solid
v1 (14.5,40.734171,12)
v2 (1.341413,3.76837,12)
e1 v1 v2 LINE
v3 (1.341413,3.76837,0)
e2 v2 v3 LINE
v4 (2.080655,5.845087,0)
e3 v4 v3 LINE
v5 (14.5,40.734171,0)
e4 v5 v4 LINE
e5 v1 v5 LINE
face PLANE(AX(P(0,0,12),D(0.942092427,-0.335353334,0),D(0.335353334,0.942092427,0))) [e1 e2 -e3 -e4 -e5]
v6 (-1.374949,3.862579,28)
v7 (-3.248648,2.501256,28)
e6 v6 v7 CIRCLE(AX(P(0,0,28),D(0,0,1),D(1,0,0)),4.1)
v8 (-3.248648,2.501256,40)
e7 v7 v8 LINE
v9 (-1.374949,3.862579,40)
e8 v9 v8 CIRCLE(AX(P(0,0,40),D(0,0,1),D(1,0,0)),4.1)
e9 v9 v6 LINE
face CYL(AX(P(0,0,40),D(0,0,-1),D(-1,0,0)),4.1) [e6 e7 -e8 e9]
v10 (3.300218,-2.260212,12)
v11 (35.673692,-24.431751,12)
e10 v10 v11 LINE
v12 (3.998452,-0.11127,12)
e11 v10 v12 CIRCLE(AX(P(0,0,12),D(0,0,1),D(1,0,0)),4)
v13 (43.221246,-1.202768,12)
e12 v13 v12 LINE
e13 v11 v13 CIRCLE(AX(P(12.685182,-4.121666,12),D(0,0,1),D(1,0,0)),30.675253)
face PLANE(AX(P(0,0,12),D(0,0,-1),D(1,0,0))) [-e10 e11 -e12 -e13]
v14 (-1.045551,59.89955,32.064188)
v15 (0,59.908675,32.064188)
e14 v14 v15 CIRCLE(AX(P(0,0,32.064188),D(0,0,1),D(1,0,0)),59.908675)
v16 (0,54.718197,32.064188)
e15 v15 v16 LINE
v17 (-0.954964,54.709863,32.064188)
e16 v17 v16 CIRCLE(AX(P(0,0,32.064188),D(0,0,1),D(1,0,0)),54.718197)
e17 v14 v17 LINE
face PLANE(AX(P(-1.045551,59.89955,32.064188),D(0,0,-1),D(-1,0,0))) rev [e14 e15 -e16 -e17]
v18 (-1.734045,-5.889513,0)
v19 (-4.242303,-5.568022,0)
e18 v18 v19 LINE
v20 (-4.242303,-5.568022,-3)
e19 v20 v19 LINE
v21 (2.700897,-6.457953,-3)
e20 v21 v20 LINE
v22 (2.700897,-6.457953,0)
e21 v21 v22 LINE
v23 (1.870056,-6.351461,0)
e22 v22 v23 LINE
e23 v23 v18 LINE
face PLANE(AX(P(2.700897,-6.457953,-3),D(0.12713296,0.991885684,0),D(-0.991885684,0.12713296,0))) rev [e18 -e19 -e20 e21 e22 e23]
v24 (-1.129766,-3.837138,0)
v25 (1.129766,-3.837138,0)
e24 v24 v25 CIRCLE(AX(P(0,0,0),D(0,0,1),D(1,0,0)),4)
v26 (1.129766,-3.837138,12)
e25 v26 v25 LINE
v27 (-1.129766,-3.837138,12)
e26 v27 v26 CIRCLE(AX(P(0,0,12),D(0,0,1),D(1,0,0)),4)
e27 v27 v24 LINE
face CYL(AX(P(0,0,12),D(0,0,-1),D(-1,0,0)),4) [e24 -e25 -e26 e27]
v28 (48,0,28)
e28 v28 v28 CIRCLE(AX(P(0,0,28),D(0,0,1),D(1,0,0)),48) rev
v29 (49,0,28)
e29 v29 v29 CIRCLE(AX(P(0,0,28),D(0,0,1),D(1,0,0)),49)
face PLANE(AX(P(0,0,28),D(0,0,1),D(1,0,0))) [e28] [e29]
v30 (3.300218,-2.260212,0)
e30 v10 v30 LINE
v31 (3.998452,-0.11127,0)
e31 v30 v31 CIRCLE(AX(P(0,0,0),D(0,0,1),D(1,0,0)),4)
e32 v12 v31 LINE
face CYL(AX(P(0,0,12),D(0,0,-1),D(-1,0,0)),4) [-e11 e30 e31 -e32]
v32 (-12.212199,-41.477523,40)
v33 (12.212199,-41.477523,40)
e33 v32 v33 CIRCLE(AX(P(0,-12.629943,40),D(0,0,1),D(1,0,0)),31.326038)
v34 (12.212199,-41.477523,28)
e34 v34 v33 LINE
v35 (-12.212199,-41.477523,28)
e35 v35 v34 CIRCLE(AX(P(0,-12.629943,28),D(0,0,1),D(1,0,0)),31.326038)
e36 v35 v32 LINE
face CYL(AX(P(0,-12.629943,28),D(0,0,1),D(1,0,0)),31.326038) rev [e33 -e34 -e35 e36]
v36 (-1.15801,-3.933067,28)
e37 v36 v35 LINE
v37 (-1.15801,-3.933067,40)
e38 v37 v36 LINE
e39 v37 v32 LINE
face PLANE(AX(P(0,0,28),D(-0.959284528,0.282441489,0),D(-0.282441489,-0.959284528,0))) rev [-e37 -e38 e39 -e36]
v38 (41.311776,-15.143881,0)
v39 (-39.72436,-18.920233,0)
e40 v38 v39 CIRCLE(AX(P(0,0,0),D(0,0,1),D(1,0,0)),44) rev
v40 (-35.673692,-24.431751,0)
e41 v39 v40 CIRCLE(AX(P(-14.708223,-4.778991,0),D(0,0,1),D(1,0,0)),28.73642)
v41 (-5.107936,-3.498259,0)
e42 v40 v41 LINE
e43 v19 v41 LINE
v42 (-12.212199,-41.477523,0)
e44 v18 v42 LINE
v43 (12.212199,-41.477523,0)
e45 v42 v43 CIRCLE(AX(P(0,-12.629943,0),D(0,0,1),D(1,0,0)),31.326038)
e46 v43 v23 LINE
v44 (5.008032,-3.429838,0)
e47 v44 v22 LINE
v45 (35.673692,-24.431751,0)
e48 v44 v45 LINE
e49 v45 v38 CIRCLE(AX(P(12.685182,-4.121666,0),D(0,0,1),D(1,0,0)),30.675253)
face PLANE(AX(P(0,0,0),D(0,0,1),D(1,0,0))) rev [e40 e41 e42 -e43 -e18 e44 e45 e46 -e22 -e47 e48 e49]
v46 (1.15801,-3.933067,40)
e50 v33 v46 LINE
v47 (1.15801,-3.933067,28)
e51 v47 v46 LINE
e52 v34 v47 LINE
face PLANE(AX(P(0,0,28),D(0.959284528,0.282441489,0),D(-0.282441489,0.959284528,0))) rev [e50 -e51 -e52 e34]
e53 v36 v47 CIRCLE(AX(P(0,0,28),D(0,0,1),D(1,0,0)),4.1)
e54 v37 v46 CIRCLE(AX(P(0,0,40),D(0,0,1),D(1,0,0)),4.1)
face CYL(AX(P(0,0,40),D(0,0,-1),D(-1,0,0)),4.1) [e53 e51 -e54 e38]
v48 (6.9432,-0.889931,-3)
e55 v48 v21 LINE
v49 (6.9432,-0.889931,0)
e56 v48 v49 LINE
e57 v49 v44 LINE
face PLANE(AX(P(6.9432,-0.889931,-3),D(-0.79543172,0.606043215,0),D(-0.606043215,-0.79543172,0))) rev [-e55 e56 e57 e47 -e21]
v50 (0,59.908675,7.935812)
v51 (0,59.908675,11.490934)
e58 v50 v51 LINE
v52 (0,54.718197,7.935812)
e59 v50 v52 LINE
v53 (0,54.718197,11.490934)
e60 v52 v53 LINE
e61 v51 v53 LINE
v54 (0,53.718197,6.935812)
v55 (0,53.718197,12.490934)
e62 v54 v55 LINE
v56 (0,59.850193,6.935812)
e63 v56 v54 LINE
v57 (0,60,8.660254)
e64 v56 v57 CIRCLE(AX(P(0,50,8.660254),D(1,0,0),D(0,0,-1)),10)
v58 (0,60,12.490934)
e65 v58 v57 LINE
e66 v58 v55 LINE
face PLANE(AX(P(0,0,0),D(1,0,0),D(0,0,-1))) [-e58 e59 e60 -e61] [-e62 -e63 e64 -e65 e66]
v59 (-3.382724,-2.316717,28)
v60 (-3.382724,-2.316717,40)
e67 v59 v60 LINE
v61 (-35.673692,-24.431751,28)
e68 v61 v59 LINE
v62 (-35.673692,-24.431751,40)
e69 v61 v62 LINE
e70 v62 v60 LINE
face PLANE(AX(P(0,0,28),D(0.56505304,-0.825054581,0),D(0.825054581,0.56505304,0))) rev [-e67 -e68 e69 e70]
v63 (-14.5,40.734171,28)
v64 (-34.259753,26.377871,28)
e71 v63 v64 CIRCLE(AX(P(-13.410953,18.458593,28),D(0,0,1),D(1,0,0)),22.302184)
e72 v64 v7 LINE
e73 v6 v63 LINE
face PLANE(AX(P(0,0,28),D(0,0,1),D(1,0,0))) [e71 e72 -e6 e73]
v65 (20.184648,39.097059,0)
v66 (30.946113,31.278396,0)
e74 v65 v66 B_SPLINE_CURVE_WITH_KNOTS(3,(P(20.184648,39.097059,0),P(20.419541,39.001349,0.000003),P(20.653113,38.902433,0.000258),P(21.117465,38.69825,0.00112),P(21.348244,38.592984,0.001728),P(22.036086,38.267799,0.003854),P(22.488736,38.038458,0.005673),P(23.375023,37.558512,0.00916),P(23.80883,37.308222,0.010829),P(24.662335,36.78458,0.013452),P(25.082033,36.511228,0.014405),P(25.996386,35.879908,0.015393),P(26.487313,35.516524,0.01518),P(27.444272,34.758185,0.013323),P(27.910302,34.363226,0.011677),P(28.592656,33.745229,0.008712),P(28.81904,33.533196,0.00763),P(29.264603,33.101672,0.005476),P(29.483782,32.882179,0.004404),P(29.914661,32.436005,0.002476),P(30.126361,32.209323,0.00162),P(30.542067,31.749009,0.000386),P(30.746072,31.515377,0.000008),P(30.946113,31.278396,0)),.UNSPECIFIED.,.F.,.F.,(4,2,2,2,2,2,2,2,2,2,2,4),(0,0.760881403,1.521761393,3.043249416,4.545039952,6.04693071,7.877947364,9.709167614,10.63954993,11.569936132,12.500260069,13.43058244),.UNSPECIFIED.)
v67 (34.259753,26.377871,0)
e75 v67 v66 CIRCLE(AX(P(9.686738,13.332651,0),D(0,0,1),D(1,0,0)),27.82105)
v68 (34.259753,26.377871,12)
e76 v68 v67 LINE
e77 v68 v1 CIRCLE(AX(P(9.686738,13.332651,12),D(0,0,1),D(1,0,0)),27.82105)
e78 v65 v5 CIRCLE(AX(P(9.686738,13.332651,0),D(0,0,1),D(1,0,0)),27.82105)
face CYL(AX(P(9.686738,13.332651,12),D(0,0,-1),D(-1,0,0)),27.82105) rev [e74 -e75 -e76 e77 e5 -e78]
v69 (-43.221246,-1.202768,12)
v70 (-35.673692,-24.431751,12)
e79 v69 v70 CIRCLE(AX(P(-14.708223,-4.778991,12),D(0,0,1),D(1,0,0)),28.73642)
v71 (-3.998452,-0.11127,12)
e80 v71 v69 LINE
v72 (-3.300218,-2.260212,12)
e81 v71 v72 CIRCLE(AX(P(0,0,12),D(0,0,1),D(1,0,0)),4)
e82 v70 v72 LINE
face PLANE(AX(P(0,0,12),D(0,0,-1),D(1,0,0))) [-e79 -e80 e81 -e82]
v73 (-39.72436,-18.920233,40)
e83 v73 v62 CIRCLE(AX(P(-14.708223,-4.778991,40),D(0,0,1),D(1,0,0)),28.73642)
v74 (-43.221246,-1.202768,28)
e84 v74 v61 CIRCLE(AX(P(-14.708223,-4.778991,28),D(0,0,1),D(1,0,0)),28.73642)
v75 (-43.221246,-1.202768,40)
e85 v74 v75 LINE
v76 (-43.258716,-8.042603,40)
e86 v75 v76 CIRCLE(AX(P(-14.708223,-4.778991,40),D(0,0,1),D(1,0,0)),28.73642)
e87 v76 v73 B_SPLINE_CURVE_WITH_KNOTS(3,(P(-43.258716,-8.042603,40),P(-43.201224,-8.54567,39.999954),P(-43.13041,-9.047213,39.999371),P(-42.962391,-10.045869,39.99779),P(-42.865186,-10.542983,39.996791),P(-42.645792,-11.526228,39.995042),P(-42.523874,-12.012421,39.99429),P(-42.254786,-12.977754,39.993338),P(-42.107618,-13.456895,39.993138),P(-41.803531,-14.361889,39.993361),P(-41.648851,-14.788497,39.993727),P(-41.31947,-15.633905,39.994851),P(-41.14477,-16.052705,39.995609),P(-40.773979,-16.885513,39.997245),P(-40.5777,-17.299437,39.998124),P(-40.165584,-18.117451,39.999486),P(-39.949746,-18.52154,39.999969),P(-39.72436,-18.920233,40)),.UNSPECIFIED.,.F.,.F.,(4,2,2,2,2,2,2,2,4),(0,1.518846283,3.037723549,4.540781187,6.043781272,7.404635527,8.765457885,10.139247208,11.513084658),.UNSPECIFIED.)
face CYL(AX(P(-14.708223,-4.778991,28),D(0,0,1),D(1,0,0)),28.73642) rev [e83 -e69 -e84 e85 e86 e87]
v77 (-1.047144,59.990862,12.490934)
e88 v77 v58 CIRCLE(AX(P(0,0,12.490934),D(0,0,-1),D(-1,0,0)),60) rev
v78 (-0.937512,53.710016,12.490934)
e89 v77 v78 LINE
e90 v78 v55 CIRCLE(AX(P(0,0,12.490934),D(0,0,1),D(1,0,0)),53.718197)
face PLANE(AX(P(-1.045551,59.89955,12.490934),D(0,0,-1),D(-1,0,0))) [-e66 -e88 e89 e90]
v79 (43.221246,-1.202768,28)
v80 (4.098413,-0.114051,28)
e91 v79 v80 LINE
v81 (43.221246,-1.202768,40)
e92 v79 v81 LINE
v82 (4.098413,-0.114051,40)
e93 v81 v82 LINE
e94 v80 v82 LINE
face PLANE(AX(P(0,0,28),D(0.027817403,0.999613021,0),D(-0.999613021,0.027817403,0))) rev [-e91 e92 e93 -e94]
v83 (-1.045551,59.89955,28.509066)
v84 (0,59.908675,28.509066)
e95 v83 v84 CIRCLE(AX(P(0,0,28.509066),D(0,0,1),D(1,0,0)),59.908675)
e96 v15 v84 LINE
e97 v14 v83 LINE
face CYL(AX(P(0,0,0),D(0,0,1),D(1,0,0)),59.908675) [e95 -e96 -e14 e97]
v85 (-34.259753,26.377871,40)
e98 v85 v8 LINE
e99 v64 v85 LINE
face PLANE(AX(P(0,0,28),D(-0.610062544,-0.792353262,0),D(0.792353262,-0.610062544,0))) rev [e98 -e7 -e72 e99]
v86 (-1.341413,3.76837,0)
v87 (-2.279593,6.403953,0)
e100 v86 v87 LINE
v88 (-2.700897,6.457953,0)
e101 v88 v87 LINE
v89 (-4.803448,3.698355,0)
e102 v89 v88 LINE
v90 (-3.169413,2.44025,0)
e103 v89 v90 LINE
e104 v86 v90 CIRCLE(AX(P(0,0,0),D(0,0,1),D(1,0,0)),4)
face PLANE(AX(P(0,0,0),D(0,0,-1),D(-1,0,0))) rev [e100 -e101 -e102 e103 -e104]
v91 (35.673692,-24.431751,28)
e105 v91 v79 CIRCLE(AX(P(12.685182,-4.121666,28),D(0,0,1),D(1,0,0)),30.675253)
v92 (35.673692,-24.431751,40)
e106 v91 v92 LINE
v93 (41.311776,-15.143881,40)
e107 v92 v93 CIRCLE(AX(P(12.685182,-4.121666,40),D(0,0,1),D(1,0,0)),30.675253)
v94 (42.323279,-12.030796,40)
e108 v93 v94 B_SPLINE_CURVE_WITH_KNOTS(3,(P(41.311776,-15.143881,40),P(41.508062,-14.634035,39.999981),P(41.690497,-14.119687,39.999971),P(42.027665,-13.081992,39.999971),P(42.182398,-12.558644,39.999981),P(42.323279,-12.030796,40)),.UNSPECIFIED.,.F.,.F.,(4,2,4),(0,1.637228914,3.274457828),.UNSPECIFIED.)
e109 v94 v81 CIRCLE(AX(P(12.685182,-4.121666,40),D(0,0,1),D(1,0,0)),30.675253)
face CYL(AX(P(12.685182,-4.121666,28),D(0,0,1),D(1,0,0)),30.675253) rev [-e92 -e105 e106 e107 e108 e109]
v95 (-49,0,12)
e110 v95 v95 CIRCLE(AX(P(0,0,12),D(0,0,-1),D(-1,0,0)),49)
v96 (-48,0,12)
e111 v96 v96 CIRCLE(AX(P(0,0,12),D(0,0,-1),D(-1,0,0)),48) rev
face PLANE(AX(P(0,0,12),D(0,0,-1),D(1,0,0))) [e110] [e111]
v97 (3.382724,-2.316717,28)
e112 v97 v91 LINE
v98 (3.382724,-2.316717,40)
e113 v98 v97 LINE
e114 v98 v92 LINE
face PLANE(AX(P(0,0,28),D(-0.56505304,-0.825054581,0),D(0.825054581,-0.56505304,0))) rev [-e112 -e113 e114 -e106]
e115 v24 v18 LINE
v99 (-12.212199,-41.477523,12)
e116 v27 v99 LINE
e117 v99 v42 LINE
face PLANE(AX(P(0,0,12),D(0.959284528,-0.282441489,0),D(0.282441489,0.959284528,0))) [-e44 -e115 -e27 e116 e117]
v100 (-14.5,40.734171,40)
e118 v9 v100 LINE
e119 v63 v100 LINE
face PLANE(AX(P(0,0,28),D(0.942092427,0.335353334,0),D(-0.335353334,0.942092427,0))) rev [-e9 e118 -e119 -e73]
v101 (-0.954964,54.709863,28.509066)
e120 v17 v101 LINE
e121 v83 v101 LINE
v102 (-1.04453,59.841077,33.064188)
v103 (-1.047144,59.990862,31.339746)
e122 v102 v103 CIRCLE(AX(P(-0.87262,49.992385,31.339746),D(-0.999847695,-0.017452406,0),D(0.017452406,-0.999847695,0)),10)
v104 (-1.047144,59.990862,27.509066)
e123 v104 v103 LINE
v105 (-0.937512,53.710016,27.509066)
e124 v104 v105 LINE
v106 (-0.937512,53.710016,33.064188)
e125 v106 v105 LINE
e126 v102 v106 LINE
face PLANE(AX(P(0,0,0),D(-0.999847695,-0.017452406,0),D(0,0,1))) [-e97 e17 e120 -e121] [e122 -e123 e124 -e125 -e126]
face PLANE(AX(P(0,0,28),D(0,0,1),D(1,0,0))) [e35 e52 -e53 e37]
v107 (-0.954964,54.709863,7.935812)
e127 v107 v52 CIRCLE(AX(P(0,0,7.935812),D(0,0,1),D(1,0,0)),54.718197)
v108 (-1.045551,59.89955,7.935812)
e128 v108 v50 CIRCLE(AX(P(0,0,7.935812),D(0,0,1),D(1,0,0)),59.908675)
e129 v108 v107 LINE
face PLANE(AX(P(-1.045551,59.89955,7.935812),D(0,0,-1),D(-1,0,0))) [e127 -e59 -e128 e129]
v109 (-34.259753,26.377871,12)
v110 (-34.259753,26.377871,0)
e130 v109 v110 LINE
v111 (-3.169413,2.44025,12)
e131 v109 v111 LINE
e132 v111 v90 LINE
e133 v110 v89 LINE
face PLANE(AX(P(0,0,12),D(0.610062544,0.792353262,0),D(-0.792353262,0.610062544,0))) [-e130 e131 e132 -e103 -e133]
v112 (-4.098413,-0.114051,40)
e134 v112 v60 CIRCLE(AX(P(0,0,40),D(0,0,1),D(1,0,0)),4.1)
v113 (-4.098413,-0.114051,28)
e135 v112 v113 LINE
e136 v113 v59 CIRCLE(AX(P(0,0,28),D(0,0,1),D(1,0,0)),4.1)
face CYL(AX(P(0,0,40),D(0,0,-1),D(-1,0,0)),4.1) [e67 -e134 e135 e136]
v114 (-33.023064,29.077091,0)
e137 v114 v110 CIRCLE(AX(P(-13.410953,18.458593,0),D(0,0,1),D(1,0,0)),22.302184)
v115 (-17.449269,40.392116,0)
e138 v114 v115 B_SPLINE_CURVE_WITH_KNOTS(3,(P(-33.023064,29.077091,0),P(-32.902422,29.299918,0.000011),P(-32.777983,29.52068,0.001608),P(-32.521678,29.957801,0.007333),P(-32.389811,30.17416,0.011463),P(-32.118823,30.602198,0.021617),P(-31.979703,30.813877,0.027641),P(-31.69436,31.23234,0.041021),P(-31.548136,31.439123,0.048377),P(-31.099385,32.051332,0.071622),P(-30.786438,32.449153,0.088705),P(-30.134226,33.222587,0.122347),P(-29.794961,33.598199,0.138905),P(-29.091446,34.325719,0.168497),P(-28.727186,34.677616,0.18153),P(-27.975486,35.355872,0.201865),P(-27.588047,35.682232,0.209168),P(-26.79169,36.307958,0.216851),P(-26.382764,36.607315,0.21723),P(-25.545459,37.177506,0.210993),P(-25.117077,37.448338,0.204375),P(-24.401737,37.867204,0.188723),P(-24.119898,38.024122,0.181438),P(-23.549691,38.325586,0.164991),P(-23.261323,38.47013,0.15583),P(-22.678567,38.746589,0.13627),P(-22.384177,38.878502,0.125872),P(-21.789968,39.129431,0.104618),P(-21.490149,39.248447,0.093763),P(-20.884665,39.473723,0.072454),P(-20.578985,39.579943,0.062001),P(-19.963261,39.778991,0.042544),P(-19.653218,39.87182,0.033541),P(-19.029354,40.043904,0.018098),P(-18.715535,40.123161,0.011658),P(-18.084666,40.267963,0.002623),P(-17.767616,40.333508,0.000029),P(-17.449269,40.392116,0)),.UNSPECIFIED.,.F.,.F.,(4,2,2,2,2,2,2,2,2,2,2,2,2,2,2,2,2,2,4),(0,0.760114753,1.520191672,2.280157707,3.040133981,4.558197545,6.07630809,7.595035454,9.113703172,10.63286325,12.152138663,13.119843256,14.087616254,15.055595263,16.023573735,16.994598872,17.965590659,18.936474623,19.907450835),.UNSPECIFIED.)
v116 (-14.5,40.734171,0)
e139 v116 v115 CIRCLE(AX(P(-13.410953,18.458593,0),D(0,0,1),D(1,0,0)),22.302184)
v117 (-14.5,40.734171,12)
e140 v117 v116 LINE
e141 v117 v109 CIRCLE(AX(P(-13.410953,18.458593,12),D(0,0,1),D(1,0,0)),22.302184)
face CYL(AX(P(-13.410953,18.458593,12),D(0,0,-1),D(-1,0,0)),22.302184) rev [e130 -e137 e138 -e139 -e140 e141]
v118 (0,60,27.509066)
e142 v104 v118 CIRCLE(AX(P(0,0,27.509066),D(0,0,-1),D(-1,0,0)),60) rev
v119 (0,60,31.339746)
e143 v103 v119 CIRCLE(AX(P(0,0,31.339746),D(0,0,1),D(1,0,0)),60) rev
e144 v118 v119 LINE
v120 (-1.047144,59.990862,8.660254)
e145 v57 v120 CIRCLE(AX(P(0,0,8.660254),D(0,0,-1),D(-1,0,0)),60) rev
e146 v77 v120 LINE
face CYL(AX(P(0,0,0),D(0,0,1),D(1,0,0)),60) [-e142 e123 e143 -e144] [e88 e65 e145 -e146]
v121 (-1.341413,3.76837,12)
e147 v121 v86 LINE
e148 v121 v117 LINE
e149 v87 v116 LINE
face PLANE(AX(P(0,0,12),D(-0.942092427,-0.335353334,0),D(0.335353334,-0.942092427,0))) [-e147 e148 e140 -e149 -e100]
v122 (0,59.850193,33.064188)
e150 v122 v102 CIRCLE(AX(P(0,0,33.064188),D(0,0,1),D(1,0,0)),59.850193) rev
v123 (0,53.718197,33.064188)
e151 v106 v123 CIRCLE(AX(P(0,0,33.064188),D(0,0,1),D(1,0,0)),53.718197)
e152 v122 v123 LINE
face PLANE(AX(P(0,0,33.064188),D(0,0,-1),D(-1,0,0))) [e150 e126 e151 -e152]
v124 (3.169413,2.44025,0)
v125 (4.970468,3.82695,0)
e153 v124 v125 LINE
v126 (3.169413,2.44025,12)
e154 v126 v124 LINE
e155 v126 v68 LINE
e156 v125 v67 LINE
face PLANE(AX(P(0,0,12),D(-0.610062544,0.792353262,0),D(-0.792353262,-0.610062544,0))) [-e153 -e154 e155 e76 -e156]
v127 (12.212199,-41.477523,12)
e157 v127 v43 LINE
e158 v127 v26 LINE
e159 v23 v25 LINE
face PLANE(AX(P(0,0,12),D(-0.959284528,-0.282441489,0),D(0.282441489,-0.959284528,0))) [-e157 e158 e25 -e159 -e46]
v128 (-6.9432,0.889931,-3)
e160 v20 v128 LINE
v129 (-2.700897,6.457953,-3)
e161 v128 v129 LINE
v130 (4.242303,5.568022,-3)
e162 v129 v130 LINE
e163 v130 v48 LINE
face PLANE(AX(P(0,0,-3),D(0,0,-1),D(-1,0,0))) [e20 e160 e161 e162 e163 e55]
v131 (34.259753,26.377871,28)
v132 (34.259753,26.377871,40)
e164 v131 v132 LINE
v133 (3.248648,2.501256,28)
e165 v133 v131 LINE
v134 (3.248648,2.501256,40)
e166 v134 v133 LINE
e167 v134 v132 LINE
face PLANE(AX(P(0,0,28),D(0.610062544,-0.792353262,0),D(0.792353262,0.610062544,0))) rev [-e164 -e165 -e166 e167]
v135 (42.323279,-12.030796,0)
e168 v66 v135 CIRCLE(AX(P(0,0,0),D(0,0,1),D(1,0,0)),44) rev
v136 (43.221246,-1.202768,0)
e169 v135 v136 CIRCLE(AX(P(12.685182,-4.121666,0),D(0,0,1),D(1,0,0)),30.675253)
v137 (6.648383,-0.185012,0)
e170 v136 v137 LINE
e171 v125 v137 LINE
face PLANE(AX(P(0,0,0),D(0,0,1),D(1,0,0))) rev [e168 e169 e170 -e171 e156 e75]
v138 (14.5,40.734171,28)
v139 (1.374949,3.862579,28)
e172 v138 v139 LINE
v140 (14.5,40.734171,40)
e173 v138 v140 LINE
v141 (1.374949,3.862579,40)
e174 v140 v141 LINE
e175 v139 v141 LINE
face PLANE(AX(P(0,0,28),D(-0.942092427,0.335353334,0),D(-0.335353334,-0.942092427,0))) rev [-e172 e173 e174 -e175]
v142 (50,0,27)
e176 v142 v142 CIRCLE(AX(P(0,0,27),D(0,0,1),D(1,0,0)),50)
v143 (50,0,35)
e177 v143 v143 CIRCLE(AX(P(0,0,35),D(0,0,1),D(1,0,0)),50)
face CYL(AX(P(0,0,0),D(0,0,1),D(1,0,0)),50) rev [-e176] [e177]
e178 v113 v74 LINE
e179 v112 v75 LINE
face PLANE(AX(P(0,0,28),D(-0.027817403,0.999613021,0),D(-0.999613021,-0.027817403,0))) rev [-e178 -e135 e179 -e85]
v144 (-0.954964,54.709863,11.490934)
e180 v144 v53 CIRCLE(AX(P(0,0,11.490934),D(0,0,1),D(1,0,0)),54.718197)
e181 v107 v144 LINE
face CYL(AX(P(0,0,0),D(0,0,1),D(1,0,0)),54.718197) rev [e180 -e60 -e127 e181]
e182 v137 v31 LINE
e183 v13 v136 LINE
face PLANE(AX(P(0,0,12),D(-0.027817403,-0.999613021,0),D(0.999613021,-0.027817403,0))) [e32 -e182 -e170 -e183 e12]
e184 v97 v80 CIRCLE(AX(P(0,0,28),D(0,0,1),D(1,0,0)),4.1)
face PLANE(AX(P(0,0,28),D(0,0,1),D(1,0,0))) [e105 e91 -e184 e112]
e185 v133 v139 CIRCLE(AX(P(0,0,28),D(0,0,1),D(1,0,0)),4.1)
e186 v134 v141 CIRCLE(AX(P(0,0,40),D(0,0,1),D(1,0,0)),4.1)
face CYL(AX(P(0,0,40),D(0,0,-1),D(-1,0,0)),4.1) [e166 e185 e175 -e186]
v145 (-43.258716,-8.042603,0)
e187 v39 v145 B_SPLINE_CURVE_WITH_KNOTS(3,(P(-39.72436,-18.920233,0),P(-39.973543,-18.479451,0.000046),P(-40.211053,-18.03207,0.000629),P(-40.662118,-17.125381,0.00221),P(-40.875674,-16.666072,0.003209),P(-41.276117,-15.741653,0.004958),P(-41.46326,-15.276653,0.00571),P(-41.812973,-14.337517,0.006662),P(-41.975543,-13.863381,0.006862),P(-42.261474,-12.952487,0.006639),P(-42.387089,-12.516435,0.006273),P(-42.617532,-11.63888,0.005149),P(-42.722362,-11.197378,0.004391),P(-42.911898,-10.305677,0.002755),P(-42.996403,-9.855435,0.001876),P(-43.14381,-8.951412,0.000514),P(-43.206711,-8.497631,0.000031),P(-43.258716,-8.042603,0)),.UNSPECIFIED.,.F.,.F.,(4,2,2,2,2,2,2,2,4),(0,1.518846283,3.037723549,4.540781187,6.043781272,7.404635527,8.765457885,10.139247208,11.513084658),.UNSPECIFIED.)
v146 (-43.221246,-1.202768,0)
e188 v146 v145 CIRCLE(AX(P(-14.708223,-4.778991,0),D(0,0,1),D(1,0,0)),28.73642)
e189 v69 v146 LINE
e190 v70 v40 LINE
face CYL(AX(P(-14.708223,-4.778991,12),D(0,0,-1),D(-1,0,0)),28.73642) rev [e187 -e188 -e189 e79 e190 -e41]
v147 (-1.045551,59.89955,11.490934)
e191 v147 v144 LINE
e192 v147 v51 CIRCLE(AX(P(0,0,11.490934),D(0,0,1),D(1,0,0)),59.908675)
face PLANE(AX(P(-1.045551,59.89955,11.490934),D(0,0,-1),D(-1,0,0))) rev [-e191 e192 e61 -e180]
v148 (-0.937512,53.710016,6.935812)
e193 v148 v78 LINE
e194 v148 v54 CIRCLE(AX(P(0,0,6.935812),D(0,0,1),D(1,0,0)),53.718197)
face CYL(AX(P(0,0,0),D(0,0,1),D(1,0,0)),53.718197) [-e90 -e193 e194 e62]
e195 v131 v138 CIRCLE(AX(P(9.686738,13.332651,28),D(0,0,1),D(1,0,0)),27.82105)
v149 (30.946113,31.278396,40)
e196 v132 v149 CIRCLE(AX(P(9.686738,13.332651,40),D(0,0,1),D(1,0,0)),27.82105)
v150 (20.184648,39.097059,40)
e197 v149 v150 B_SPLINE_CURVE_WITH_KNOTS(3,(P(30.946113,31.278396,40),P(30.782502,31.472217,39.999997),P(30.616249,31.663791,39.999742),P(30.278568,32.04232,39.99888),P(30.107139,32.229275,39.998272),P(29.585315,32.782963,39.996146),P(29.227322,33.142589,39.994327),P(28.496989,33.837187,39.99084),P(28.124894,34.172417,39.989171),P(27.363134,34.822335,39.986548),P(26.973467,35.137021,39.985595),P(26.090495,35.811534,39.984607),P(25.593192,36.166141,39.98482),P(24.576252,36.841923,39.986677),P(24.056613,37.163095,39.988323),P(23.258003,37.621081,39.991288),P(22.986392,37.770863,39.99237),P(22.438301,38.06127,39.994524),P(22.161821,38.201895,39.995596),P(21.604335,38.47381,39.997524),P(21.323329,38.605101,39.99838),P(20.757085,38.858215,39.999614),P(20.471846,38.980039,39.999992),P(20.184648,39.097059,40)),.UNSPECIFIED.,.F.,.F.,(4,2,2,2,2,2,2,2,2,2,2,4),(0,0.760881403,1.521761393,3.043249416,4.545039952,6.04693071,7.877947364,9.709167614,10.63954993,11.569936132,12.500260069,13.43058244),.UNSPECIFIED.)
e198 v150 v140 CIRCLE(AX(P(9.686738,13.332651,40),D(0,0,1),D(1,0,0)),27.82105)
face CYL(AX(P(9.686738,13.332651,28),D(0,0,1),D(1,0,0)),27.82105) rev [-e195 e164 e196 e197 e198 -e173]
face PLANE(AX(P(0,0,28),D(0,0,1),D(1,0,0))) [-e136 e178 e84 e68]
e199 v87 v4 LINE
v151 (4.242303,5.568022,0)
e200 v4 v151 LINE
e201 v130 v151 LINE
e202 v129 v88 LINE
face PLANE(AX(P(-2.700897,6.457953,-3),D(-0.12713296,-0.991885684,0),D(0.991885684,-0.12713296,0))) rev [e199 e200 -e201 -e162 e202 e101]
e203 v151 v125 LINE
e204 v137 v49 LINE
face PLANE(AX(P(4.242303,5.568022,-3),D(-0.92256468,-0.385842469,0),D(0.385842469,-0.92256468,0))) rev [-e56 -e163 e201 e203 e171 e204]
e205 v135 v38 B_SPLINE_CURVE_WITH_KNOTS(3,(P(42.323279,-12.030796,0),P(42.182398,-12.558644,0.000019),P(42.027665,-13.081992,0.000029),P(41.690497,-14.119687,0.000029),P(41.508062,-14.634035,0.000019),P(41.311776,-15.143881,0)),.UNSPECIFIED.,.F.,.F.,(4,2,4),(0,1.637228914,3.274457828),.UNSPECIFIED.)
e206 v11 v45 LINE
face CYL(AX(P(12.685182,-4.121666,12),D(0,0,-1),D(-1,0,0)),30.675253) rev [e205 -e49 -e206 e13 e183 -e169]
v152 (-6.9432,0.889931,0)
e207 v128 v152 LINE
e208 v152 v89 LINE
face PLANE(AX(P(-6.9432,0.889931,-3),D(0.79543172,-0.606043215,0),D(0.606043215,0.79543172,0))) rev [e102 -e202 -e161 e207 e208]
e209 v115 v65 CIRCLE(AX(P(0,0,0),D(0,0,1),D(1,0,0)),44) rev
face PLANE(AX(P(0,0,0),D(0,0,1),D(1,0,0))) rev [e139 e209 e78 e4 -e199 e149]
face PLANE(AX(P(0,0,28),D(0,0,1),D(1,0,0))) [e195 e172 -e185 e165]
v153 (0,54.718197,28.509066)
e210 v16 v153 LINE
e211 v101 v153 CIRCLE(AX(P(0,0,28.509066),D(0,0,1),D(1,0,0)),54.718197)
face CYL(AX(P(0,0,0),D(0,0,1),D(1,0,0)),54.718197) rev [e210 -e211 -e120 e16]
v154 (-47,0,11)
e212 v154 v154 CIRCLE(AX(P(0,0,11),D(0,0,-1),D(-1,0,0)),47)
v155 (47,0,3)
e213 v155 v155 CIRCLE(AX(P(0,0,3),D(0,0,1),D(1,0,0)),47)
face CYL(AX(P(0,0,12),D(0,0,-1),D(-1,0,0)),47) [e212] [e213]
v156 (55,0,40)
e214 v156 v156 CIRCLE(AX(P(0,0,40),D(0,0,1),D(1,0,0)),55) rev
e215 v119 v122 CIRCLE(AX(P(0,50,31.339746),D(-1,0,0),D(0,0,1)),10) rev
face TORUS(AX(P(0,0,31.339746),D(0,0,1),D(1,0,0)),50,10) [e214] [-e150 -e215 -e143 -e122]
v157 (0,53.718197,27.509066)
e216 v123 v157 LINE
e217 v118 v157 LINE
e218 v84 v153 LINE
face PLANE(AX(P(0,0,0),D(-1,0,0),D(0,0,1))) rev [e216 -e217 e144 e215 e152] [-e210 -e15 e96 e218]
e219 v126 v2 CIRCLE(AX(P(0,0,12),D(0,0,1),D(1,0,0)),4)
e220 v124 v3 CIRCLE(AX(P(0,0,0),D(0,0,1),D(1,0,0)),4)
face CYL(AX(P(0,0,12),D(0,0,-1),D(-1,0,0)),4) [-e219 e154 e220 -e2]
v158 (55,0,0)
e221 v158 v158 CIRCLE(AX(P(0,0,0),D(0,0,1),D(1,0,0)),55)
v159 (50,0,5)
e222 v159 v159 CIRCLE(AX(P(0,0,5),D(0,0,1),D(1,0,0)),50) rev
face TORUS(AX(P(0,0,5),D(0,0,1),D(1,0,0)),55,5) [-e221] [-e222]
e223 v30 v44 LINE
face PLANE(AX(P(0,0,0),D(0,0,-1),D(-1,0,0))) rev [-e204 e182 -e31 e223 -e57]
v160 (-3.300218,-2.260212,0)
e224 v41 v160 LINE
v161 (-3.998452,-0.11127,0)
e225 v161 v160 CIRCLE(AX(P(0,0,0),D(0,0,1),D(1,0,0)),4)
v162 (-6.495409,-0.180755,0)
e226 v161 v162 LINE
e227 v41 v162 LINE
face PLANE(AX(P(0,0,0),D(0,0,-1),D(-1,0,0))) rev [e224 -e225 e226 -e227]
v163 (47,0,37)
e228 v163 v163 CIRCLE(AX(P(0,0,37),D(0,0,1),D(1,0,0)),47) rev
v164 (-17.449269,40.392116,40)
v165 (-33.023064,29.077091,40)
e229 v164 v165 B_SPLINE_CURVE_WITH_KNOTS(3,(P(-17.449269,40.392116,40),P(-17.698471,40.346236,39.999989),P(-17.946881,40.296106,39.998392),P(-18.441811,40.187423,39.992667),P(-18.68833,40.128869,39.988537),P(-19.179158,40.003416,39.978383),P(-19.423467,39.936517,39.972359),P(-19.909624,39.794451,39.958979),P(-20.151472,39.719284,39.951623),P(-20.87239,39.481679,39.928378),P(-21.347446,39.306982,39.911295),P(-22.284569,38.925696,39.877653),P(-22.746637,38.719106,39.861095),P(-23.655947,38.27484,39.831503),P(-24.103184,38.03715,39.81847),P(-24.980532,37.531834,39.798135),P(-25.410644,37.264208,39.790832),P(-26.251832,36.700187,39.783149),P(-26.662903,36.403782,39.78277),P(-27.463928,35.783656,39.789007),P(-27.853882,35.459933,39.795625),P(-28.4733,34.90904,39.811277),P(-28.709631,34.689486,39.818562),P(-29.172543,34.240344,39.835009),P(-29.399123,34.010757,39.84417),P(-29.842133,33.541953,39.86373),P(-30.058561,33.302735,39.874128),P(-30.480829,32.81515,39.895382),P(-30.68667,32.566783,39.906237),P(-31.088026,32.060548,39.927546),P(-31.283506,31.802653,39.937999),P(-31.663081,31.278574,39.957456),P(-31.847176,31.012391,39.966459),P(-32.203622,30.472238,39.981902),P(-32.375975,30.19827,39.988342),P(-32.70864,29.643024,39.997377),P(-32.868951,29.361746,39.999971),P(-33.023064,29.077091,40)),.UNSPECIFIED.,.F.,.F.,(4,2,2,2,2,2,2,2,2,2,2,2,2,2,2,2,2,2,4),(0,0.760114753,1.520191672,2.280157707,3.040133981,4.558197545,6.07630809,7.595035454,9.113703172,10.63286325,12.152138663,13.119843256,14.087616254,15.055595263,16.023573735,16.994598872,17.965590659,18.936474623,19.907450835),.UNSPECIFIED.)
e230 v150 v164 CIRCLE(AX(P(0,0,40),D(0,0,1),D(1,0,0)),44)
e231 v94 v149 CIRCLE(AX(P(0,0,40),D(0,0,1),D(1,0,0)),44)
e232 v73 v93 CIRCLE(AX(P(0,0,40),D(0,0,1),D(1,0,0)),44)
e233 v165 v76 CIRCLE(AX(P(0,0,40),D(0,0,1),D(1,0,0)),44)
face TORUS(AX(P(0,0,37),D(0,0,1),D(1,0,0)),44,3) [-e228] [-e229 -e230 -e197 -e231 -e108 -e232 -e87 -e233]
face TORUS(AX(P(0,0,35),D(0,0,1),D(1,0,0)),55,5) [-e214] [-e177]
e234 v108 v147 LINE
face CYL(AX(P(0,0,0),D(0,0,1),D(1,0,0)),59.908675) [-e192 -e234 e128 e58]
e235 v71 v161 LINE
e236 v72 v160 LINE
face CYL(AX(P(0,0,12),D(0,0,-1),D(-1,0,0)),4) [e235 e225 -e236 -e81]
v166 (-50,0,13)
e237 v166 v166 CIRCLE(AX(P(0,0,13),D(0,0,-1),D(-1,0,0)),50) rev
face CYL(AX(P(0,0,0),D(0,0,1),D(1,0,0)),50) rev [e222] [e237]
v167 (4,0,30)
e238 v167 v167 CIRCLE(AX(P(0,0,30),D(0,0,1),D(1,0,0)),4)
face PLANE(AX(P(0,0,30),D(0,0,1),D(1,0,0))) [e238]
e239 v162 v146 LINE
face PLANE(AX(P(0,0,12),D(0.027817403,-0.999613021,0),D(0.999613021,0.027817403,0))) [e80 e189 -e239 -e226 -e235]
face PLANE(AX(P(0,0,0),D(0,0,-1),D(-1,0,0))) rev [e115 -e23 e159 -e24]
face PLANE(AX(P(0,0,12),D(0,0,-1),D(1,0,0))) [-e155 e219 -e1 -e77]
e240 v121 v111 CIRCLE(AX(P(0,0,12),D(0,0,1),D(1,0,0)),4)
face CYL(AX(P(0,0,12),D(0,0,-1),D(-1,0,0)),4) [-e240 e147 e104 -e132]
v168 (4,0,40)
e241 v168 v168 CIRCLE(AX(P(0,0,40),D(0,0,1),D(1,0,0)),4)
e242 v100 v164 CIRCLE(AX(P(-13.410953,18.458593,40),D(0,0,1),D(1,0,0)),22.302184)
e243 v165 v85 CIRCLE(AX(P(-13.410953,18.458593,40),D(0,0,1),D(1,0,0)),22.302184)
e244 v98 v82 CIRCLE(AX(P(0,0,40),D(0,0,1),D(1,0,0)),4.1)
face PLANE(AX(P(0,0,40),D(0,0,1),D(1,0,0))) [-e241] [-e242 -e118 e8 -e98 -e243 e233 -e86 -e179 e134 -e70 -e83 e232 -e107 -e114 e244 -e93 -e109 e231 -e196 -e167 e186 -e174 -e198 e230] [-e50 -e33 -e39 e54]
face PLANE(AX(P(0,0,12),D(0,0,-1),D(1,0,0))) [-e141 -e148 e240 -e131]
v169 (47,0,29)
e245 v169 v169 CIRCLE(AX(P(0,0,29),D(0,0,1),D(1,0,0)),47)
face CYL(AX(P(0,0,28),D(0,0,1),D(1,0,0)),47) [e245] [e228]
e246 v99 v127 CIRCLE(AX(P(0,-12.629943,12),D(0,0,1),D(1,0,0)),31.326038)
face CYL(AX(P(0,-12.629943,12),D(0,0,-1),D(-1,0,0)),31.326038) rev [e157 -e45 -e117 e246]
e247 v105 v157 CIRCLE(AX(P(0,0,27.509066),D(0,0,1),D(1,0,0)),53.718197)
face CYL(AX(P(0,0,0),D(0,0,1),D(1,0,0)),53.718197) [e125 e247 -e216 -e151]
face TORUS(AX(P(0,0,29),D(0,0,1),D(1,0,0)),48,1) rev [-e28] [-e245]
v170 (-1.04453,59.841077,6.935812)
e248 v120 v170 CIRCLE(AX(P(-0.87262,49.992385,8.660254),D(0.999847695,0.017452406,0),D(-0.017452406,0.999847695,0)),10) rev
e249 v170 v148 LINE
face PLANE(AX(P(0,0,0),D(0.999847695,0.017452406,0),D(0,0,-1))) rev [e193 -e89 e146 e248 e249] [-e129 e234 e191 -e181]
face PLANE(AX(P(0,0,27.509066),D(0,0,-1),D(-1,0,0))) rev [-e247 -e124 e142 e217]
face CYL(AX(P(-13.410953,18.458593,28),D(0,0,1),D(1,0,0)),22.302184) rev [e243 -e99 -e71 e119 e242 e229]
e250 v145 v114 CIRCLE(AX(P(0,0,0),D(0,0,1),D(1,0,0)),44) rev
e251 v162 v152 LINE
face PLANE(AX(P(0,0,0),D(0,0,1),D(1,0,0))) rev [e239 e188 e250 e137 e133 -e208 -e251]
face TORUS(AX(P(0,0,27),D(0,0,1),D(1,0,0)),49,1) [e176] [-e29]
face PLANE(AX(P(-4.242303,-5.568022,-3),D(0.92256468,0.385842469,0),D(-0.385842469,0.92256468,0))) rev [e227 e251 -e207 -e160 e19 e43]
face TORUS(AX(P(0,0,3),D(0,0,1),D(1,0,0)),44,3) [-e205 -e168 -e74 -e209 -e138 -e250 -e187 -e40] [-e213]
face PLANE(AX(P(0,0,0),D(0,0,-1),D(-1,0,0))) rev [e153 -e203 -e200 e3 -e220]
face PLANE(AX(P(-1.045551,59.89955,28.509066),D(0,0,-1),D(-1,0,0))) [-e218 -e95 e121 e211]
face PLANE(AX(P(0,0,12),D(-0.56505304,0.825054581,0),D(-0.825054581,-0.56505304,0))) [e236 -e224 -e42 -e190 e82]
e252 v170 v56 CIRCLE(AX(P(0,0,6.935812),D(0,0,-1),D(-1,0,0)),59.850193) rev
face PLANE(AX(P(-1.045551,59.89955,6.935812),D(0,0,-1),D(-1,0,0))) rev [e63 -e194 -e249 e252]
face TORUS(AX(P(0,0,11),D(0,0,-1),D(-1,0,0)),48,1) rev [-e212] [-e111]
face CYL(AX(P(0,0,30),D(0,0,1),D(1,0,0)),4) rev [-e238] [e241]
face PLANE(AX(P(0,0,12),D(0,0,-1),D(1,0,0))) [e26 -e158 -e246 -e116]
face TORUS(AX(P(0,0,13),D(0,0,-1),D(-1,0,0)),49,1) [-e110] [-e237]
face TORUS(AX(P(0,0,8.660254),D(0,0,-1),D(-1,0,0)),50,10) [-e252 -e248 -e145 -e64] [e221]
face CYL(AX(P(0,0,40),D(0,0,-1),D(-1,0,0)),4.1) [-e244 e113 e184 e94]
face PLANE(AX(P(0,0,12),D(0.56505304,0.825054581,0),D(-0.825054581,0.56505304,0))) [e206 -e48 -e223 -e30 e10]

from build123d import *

# Parameters (mm, degrees)
SKETCH1_R                 = 50
BOSS_EXTRUDE1_DEPTH       = 40
CUT_EXTRUDE2_DEPTH        = 12
SKETCH3_R                 = 60
SKETCH3_R_2               = 50
BOSS_EXTRUDE2_DEPTH       = 40
CUT_EXTRUDE3_START        = -12
SKETCH4_R                 = 50
SKETCH4_R_2               = 47
CUT_EXTRUDE3_DEPTH        = 12
FILLET1_R                 = 3
FILLET2_R                 = 5
FILLET3_R                 = 1
CUT_REVOLVE_THIN2_START   = 6.935812213
CUT_REVOLVE_THIN2_DEPTH   = 1
CUT_REVOLVE_THIN2_START_2 = 11.490933941
CUT_REVOLVE_THIN2_2_DEPTH = 1
CUT_REVOLVE_THIN2_START_3 = 27.509066059
CUT_REVOLVE_THIN2_3_DEPTH = 1
CUT_REVOLVE_THIN2_START_4 = 32.064187787
CUT_REVOLVE_THIN2_4_DEPTH = 1
CUT_REVOLVE_THIN2_START_5 = 7.935812213
CUT_REVOLVE_THIN2_5_DEPTH = 3.555121728
CUT_REVOLVE_THIN2_START_6 = 28.509066059
CUT_REVOLVE_THIN2_6_DEPTH = 3.555121728
FILLET4_R                 = 10
SKETCH6_R                 = 4
CUT_EXTRUDE4_DEPTH        = 10
BOSS_EXTRUDE3_DEPTH       = 3
SKETCH8_R                 = 4.1
SKETCH8_R_2               = 4
BOSS_EXTRUDE4_DEPTH       = 12


with BuildPart() as part:
    # Sketch1 → Boss-Extrude1 (new body)
    with BuildSketch(Plane.XY):
        Circle(SKETCH1_R)
    extrude(amount=BOSS_EXTRUDE1_DEPTH)

    # Sketch2 → Cut-Extrude2 (cut)
    with BuildSketch(Plane.XY.offset(40)):
        with BuildLine():
            ThreePointArc((-3.16941305, 2.440250176), (-2.351141009, 3.236067977), (-1.341413336, 3.768369709))
            Line((-1.341413336, 3.768369709), (-14.5, 40.734171408))
            ThreePointArc((-14.5, 40.734171408), (-26.519847709, 36.501438921), (-34.259752735, 26.377870703))
            Line((-34.259752735, 26.377870703), (-3.16941305, 2.440250176))
        make_face()
        with BuildLine():
            Line((14.5, 40.734171408), (1.341413336, 3.768369709))
            ThreePointArc((1.341413336, 3.768369709), (2.351141009, 3.236067977), (3.16941305, 2.440250176))
            Line((3.16941305, 2.440250176), (34.259752735, 26.377870703))
            ThreePointArc((34.259752735, 26.377870703), (26.039540738, 35.840353089), (14.5, 40.734171408))
        make_face()
        with BuildLine():
            Line((43.221245572, -1.202768269), (3.998452085, -0.111269614))
            ThreePointArc((3.998452085, -0.111269614), (3.804226065, -1.236067977), (3.300218326, -2.260212159))
            Line((3.300218326, -2.260212159), (35.673691636, -24.431750763))
            ThreePointArc((35.673691636, -24.431750763), (41.859081171, -13.600839939), (43.221245572, -1.202768269))
        make_face()
        with BuildLine():
            ThreePointArc((1.129765954, -3.837138112), (0, -4), (-1.129765954, -3.837138112))
            Line((-1.129765954, -3.837138112), (-12.212198799, -41.477523079))
            ThreePointArc((-12.212198799, -41.477523079), (0, -43.955981315), (12.212198799, -41.477523079))
            Line((12.212198799, -41.477523079), (1.129765954, -3.837138112))
        make_face()
        with BuildLine():
            ThreePointArc((-3.300218326, -2.260212159), (-3.804226065, -1.236067977), (-3.998452085, -0.111269614))
            Line((-3.998452085, -0.111269614), (-43.221245572, -1.202768269))
            ThreePointArc((-43.221245572, -1.202768269), (-42.038182416, -13.659033461), (-35.673691636, -24.431750763))
            Line((-35.673691636, -24.431750763), (-3.300218326, -2.260212159))
        make_face()
    cut_extrude2 = extrude(amount=-CUT_EXTRUDE2_DEPTH, mode=Mode.SUBTRACT)

    # Mirror1: Cut-Extrude2 across plane
    add(cut_extrude2.mirror(Plane.XY.offset(20)), mode=Mode.SUBTRACT)

    # Sketch4 → Cut-Extrude3 (cut)
    with BuildSketch(Plane.XY.offset(40).offset(CUT_EXTRUDE3_START)):
        Circle(SKETCH4_R)
        Circle(SKETCH4_R_2, mode=Mode.SUBTRACT)
    cut_extrude3 = extrude(amount=CUT_EXTRUDE3_DEPTH, mode=Mode.SUBTRACT)

    # Mirror2: Cut-Extrude3 across plane
    add(cut_extrude3.mirror(Plane.XY.offset(20)), mode=Mode.SUBTRACT)

    # Fillet1
    # the kernel refuses this fillet: 3 mm, written as the material it takes off along each edge
    with BuildSketch(Plane(origin=(0, 0, 40), x_dir=(1, 0, 0), z_dir=(0, -1, 0))) as fillet1_piece_1:
        with BuildLine():
            CenterArc((47 - FILLET1_R, -FILLET1_R), FILLET1_R, 0, 90)
            Line((47 - FILLET1_R, 0), (47, 0))
            Line((47, 0), (47, -FILLET1_R))
        make_face()
    revolve(axis=Axis((0, 0, 40), (0, 0, 1)), mode=Mode.SUBTRACT)
    with BuildSketch(Plane(origin=(0, 0, 0), x_dir=(1, 0, 0), z_dir=(0, -1, 0))) as fillet1_piece_2:
        with BuildLine():
            CenterArc((47 - FILLET1_R, FILLET1_R), FILLET1_R, 270, 90)
            Line((47 - FILLET1_R, 0), (47, 0))
            Line((47, 0), (47, FILLET1_R))
        make_face()
    revolve(axis=Axis((0, 0, 0), (0, 0, 1)), mode=Mode.SUBTRACT)

    # Fillet3
    fillet3_edges = [part.edges().sort_by_distance(p)[0] for p in [
        (-50, 0, 28),
        (-47, 0, 28),
        (-50, 0, 12),
        (-47, 0, 12),
    ]]
    fillet(fillet3_edges, radius=FILLET3_R)

    # Sketch6 → Cut-Extrude4 (cut)
    with BuildSketch(Plane.XY.offset(40)):
        Circle(SKETCH6_R)
    extrude(amount=-CUT_EXTRUDE4_DEPTH, mode=Mode.SUBTRACT)


with BuildPart() as body_2:
    # Sketch3 → Boss-Extrude2 (new body)
    with BuildSketch(Plane.XY.offset(40)):
        Circle(SKETCH3_R)
        Circle(SKETCH3_R_2, mode=Mode.SUBTRACT)
    extrude(amount=-BOSS_EXTRUDE2_DEPTH)

    # Fillet2
    fillet2_edges = [body_2.edges().sort_by_distance(p)[0] for p in [
        (-50, 0, 0),
        (-50, 0, 40),
    ]]
    fillet(fillet2_edges, radius=FILLET2_R)

    # Cut-Revolve-Thin2: read off the stored shape, not the designer's step
    # Cut-Revolve-Thin2 outline → Cut-Revolve-Thin2 (cut)
    with BuildSketch(Plane.XY.offset(CUT_REVOLVE_THIN2_START)):
        with BuildLine():
            ThreePointArc((0, 53.718197142), (0.468773798, -53.716151717), (-0.93751181, 53.7100156))
            Line((-0.93751181, 53.7100156), (-1.047144386, 59.990861709))
            ThreePointArc((-1.047144386, 59.990861709), (0.52359213, -59.997715384), (0, 60))
            Line((0, 60), (0, 53.718197142))
        make_face()
    extrude(amount=CUT_REVOLVE_THIN2_DEPTH, mode=Mode.SUBTRACT)

    # Cut-Revolve-Thin2 2 outline → Cut-Revolve-Thin2 2 (cut)
    with BuildSketch(Plane.XY.offset(CUT_REVOLVE_THIN2_START_2)):
        with BuildLine():
            ThreePointArc((0, 53.718197142), (0.468773798, -53.716151717), (-0.93751181, 53.7100156))
            Line((-0.93751181, 53.7100156), (-1.047144386, 59.990861709))
            ThreePointArc((-1.047144386, 59.990861709), (0.52359213, -59.997715384), (0, 60))
            Line((0, 60), (0, 53.718197142))
        make_face()
    extrude(amount=CUT_REVOLVE_THIN2_2_DEPTH, mode=Mode.SUBTRACT)

    # Cut-Revolve-Thin2 3 outline → Cut-Revolve-Thin2 3 (cut)
    with BuildSketch(Plane.XY.offset(CUT_REVOLVE_THIN2_START_3)):
        with BuildLine():
            ThreePointArc((0, 53.718197142), (0.468773798, -53.716151717), (-0.93751181, 53.7100156))
            Line((-0.93751181, 53.7100156), (-1.047144386, 59.990861709))
            ThreePointArc((-1.047144386, 59.990861709), (0.52359213, -59.997715384), (0, 60))
            Line((0, 60), (0, 53.718197142))
        make_face()
    extrude(amount=CUT_REVOLVE_THIN2_3_DEPTH, mode=Mode.SUBTRACT)

    # Cut-Revolve-Thin2 4 outline → Cut-Revolve-Thin2 4 (cut)
    with BuildSketch(Plane.XY.offset(CUT_REVOLVE_THIN2_START_4)):
        with BuildLine():
            ThreePointArc((0, 53.718197142), (0.468773798, -53.716151717), (-0.93751181, 53.7100156))
            Line((-0.93751181, 53.7100156), (-1.047144386, 59.990861709))
            ThreePointArc((-1.047144386, 59.990861709), (0.52359213, -59.997715384), (0, 60))
            Line((0, 60), (0, 53.718197142))
        make_face()
    extrude(amount=CUT_REVOLVE_THIN2_4_DEPTH, mode=Mode.SUBTRACT)

    # Cut-Revolve-Thin2 5 outline → Cut-Revolve-Thin2 5 (cut)
    with BuildSketch(Plane.XY.offset(CUT_REVOLVE_THIN2_START_5)):
        with BuildLine():
            ThreePointArc((0, 53.718197142), (0.468773798, -53.716151717), (-0.93751181, 53.7100156))
            Line((-0.93751181, 53.7100156), (-0.954964216, 54.709863295))
            ThreePointArc((-0.954964216, 54.709863295), (0.477500352, -54.716113639), (0, 54.718197142))
            Line((0, 54.718197142), (0, 53.718197142))
        make_face()
        with BuildLine():
            ThreePointArc((0, 59.908674864), (0.522795137, -59.906393725), (-1.045550543, 59.899550483))
            Line((-1.045550543, 59.899550483), (-1.047144386, 59.990861709))
            ThreePointArc((-1.047144386, 59.990861709), (0.52359213, -59.997715384), (0, 60))
            Line((0, 60), (0, 59.908674864))
        make_face()
    extrude(amount=CUT_REVOLVE_THIN2_5_DEPTH, mode=Mode.SUBTRACT)

    # Cut-Revolve-Thin2 6 outline → Cut-Revolve-Thin2 6 (cut)
    with BuildSketch(Plane.XY.offset(CUT_REVOLVE_THIN2_START_6)):
        with BuildLine():
            ThreePointArc((0, 53.718197142), (0.468773798, -53.716151717), (-0.93751181, 53.7100156))
            Line((-0.93751181, 53.7100156), (-0.954964216, 54.709863295))
            ThreePointArc((-0.954964216, 54.709863295), (0.477500352, -54.716113639), (0, 54.718197142))
            Line((0, 54.718197142), (0, 53.718197142))
        make_face()
        with BuildLine():
            ThreePointArc((0, 59.908674864), (0.522795137, -59.906393725), (-1.045550543, 59.899550483))
            Line((-1.045550543, 59.899550483), (-1.047144386, 59.990861709))
            ThreePointArc((-1.047144386, 59.990861709), (0.52359213, -59.997715384), (0, 60))
            Line((0, 60), (0, 59.908674864))
        make_face()
    extrude(amount=CUT_REVOLVE_THIN2_6_DEPTH, mode=Mode.SUBTRACT)

    # Fillet4
    # the kernel refuses this fillet: 10 mm, written as the material it takes off along each edge
    with BuildSketch(Plane(origin=(0, 0, 0), x_dir=(1, 0, 0), z_dir=(0, -1, 0))) as fillet4_piece_1:
        with BuildLine():
            CenterArc((50, 8.660254038), FILLET4_R, 300, 60)
            Line((60, 8.660254038), (60, 0))
            Line((60, 0), (55, 0))
        make_face()
    revolve(axis=Axis((0, 0, 0), (0, 0, 1)), mode=Mode.SUBTRACT)
    with BuildSketch(Plane(origin=(0, 0, 40), x_dir=(1, 0, 0), z_dir=(0, -1, 0))) as fillet4_piece_2:
        with BuildLine():
            CenterArc((50, -8.660254038), FILLET4_R, 0, 60)
            Line((55, 0), (60, 0))
            Line((60, 0), (60, -8.660254038))
        make_face()
    revolve(axis=Axis((0, 0, 40), (0, 0, 1)), mode=Mode.SUBTRACT)


    add(part.part)  # Boss-Extrude3 merges part
    # Sketch7 → Boss-Extrude3 (add)
    with BuildSketch(Plane(origin=(0, 0, 0), x_dir=(-1, 0, 0), z_dir=(0, 0, -1))):
        Polygon((4.242302507, -5.56802204), (6.943199789, 0.889930721), (2.700897282, 6.457952762), (-4.242302507, 5.56802204), (-6.943199789, -0.889930721), (-2.700897282, -6.457952762), align=None)
    extrude(amount=BOSS_EXTRUDE3_DEPTH)

    # Sketch8 → Boss-Extrude4 (add)
    with BuildSketch(Plane.XY.offset(28)):
        Circle(SKETCH8_R)
        Circle(SKETCH8_R_2, mode=Mode.SUBTRACT)
    extrude(amount=BOSS_EXTRUDE4_DEPTH)


solid = body_2.part
